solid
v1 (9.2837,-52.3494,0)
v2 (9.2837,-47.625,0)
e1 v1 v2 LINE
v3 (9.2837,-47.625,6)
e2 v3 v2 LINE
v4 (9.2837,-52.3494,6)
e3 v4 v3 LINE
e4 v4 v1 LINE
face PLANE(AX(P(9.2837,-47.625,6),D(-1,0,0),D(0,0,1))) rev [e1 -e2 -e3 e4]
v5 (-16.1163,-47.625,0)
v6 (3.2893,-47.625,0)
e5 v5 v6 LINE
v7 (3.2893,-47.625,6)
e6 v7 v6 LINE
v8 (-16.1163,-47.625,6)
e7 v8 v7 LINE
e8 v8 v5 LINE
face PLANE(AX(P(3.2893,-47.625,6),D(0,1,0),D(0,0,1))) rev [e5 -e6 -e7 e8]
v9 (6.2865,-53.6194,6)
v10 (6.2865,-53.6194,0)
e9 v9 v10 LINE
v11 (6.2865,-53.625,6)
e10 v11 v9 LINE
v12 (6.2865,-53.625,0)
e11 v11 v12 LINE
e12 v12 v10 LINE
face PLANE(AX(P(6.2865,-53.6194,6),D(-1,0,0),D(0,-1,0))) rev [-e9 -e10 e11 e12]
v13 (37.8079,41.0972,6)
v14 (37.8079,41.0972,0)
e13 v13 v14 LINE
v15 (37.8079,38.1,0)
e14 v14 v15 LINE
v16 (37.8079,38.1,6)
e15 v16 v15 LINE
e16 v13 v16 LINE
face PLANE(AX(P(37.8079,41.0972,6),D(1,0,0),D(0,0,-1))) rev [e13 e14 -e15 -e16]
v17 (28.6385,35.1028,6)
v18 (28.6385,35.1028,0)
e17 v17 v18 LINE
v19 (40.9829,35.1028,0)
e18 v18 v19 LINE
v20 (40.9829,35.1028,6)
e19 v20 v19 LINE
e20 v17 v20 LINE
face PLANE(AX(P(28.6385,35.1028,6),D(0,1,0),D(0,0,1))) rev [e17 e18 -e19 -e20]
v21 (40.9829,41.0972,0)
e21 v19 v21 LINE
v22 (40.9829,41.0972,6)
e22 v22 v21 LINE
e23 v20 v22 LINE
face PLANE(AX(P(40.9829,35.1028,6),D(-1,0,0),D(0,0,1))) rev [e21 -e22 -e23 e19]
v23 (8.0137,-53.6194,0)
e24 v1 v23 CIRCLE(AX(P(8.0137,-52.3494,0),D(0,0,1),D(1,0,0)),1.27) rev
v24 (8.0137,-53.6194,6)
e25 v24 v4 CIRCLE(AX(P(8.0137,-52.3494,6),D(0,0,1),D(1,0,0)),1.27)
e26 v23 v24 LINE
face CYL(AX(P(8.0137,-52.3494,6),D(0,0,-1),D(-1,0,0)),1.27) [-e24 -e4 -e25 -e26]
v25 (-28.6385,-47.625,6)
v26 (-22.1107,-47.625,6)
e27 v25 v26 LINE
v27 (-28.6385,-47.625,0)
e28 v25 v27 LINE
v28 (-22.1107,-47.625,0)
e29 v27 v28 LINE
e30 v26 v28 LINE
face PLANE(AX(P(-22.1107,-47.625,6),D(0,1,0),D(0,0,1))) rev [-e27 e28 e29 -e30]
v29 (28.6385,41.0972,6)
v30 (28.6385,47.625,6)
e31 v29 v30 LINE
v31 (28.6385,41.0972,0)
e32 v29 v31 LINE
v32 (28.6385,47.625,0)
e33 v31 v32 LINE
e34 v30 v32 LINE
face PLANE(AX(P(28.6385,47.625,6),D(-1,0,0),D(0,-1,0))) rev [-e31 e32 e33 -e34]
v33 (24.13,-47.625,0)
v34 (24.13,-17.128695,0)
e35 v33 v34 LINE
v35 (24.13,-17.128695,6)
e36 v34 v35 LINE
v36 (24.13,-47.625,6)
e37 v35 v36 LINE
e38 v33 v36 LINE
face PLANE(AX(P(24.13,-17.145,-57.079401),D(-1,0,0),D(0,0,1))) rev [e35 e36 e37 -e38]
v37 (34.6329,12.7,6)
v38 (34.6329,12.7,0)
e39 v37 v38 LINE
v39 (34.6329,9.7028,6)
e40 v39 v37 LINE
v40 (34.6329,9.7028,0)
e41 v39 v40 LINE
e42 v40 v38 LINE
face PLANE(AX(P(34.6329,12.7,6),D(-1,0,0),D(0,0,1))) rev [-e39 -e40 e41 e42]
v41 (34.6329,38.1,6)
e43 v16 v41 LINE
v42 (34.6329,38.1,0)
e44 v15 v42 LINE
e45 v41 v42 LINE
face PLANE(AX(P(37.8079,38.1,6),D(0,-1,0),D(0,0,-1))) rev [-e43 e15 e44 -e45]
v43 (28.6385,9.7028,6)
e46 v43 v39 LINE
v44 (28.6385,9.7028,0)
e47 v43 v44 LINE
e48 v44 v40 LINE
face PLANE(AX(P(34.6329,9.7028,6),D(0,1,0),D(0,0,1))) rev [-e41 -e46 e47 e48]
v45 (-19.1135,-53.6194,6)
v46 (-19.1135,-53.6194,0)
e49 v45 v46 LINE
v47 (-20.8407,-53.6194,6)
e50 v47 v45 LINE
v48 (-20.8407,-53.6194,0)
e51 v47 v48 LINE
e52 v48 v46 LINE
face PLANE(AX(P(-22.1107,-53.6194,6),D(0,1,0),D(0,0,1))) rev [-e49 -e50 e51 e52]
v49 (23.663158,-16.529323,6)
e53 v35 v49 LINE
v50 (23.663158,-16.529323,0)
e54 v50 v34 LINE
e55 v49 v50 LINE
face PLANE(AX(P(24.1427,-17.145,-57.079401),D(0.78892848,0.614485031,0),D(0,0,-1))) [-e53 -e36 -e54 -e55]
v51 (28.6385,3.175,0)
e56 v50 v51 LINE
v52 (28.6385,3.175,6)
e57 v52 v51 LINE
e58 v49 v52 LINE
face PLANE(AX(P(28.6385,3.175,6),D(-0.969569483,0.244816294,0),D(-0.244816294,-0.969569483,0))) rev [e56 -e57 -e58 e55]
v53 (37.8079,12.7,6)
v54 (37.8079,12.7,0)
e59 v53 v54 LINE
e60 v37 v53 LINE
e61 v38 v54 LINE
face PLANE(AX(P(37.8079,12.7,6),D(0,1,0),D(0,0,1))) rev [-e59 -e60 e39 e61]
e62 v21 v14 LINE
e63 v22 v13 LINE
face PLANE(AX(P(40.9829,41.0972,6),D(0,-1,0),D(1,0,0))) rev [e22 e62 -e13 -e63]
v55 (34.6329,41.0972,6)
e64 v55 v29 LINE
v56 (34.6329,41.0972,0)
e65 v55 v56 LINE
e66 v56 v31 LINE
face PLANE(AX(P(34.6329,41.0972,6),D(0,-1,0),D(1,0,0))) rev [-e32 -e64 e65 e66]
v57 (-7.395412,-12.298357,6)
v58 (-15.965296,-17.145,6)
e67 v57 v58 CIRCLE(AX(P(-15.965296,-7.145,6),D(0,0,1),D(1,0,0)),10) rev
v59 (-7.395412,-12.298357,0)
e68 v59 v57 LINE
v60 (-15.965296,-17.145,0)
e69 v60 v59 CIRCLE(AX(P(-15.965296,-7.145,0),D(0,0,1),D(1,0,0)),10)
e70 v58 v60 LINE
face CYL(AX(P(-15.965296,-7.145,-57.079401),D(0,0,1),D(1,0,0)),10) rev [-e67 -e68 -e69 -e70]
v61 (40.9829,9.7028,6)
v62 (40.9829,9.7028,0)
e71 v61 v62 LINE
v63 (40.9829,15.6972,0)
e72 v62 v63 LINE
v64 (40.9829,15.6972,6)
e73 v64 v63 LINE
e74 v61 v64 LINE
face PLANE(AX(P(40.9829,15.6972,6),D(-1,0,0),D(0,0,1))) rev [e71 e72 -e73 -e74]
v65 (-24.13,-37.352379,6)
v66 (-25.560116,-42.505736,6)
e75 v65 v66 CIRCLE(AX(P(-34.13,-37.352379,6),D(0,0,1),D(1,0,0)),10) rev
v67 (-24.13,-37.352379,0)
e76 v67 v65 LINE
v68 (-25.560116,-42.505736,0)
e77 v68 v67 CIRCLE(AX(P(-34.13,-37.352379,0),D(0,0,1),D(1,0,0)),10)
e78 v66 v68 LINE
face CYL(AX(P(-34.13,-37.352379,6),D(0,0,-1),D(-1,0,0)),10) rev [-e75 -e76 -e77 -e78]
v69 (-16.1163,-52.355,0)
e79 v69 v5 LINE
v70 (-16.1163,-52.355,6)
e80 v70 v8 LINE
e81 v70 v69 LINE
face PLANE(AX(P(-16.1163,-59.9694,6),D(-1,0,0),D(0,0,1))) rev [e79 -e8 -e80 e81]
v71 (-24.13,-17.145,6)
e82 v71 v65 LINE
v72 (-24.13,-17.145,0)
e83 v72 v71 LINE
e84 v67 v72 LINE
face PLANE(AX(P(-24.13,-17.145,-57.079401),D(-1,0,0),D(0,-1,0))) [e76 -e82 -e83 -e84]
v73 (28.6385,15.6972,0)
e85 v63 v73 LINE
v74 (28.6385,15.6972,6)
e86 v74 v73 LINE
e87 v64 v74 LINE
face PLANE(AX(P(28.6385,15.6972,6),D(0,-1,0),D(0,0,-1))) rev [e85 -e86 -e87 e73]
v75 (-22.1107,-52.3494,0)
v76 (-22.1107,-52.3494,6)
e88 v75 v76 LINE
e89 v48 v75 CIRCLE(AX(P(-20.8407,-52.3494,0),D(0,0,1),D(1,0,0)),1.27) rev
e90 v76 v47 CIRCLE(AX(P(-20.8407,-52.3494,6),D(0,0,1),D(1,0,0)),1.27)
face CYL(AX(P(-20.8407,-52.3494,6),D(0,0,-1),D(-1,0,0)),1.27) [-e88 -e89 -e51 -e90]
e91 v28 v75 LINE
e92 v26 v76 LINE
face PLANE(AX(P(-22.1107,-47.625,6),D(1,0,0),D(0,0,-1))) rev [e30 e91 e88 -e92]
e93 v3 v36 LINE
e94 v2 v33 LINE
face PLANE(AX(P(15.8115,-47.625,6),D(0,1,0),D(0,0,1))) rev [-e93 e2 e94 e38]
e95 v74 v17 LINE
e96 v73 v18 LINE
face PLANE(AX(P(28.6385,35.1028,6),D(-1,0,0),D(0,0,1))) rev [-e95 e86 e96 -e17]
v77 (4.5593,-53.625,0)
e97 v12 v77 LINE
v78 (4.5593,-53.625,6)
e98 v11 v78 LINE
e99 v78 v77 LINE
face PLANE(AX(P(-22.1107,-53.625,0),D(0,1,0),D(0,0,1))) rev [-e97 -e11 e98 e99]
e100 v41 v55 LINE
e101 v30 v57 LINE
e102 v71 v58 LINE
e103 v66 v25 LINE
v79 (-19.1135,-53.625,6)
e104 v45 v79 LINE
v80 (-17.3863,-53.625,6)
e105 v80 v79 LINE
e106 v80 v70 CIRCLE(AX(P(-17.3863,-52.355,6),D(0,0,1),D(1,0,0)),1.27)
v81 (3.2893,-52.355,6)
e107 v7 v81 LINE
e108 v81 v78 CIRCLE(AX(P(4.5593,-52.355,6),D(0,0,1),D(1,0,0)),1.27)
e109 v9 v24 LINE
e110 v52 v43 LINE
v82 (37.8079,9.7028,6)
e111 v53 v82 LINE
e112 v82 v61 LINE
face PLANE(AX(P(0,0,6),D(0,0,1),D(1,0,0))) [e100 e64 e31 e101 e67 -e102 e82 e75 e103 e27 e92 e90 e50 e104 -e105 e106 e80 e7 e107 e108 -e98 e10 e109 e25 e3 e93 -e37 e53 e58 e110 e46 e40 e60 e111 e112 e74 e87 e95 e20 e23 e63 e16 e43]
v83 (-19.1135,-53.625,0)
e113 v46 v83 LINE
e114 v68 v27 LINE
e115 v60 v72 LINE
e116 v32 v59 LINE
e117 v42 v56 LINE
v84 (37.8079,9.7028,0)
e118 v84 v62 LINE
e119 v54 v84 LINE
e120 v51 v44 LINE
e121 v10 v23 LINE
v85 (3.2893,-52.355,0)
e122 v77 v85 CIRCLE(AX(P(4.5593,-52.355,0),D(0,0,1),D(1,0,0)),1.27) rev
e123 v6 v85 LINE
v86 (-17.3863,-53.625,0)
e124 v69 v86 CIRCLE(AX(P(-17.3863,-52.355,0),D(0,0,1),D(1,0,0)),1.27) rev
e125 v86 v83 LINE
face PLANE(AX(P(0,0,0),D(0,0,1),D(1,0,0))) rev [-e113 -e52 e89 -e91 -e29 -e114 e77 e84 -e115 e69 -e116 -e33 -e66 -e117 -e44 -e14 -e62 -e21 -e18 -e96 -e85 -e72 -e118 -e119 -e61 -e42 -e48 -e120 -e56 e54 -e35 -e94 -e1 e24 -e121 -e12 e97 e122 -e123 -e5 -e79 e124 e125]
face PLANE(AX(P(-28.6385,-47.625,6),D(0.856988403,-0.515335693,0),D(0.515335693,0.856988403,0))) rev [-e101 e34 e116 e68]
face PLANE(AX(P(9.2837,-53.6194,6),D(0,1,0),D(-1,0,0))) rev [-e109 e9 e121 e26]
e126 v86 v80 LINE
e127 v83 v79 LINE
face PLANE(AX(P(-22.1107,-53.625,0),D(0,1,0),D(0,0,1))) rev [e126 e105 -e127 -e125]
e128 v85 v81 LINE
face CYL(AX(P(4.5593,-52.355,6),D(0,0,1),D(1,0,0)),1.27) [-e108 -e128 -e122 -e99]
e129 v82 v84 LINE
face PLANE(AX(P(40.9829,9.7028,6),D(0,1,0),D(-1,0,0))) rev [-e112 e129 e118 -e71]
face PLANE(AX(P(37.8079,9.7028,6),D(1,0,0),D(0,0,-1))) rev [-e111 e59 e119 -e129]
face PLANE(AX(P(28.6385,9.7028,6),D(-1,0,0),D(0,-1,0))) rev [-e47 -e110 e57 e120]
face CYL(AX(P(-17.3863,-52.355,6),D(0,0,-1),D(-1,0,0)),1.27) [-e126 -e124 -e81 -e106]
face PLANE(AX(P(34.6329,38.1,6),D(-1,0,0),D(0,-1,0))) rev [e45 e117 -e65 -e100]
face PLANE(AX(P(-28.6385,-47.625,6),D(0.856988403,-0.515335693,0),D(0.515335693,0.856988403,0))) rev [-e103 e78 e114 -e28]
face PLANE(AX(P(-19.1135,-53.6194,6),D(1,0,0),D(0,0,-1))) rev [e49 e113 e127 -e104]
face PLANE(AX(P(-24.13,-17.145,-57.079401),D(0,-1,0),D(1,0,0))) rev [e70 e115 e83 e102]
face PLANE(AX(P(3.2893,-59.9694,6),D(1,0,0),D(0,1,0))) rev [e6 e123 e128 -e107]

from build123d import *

# Parameters (mm, degrees)
BOSS_EXTRUDE1_DEPTH = 6
SKETCH3_W           = 48.26
SKETCH3_H           = 30.48
BOSS_EXTRUDE2_DEPTH = 6
CHAMFER1_SIZE       = 0.635
FILLET1_R           = 10
SKETCH4_W           = 31.3944
SKETCH4_H           = 6.3444
CUT_EXTRUDE1_DEPTH  = 73.882968029
FILLET2_R           = 1.27


with BuildPart() as part:
    # Sketch1 → Boss-Extrude1 (new body)
    with BuildSketch(Plane.XY):
        Polygon((28.6385, 47.625), (28.6385, 41.0972), (34.6329, 41.0972), (34.6329, 38.1), (37.8079, 38.1), (37.8079, 41.0972), (40.9829, 41.0972), (40.9829, 35.1028), (28.6385, 35.1028), (28.6385, 15.6972), (40.9829, 15.6972), (40.9829, 9.7028), (37.8079, 9.7028), (37.8079, 12.7), (34.6329, 12.7), (34.6329, 9.7028), (28.6385, 9.7028), (28.6385, 3.175), (15.8115, -47.625), (9.2837, -47.625), (9.2837, -53.6194), (6.2865, -53.6194), (6.2865, -56.7944), (9.2837, -56.7944), (9.2837, -59.9694), (3.2893, -59.9694), (3.2893, -47.625), (-16.1163, -47.625), (-16.1163, -59.9694), (-22.1107, -59.9694), (-22.1107, -56.7944), (-19.1135, -56.7944), (-19.1135, -53.6194), (-22.1107, -53.6194), (-22.1107, -47.625), (-28.6385, -47.625), align=None)
    extrude(amount=BOSS_EXTRUDE1_DEPTH)

    # Sketch3 → Boss-Extrude2 (add)
    with BuildSketch(Plane.XY.offset(6)):
        with Locations((0, -32.385)):
            Rectangle(SKETCH3_W, SKETCH3_H)
    extrude(amount=-BOSS_EXTRUDE2_DEPTH)

    # Chamfer1
    # the kernel refuses this chamfer: 0.635 mm, written as the material it adds along each edge
    with BuildSketch(Plane(origin=(23.5077, -17.145, 6), x_dir=(0.9995260143911436, -0.0307854926118649, 0), z_dir=(0, 0, -1))) as chamfer1_piece_1_section:
        Polygon((CHAMFER1_SIZE * 0.999526014391, -CHAMFER1_SIZE * 0.0307854926119), (CHAMFER1_SIZE * 0.214851580859, -CHAMFER1_SIZE * 0.976646711049), (0, 0), align=None)
    chamfer1_piece_1 = extrude(amount=6, mode=Mode.PRIVATE)
    chamfer1_piece_1 = split(chamfer1_piece_1, bisect_by=Plane(origin=(24.13, -16.940914613, 3), z_dir=(-1, 0, 0)), keep=Keep.TOP, mode=Mode.PRIVATE)
    add(chamfer1_piece_1)

    # Fillet1
    fillet1_edges = [part.edges().sort_by_distance(p)[0] for p in [
        (-10.30986, -17.145, 3),
        (-24.13, -40.127494457, 3),
    ]]
    fillet(fillet1_edges, radius=FILLET1_R)

    # Sketch4 → Cut-Extrude1 (cut, through all)
    with BuildSketch(Plane.XY.offset(6)):
        with Locations((-6.4135, -56.7972)):
            Rectangle(SKETCH4_W, SKETCH4_H)
    extrude(amount=-CUT_EXTRUDE1_DEPTH, mode=Mode.SUBTRACT)

    # Fillet2
    fillet2_edges = [part.edges().sort_by_distance(p)[0] for p in [
        (-16.1163, -53.625, 3),
        (3.2893, -53.625, 3),
        (9.2837, -53.6194, 3),
        (-22.1107, -53.6194, 3),
    ]]
    fillet(fillet2_edges, radius=FILLET2_R)


solid = part.part
